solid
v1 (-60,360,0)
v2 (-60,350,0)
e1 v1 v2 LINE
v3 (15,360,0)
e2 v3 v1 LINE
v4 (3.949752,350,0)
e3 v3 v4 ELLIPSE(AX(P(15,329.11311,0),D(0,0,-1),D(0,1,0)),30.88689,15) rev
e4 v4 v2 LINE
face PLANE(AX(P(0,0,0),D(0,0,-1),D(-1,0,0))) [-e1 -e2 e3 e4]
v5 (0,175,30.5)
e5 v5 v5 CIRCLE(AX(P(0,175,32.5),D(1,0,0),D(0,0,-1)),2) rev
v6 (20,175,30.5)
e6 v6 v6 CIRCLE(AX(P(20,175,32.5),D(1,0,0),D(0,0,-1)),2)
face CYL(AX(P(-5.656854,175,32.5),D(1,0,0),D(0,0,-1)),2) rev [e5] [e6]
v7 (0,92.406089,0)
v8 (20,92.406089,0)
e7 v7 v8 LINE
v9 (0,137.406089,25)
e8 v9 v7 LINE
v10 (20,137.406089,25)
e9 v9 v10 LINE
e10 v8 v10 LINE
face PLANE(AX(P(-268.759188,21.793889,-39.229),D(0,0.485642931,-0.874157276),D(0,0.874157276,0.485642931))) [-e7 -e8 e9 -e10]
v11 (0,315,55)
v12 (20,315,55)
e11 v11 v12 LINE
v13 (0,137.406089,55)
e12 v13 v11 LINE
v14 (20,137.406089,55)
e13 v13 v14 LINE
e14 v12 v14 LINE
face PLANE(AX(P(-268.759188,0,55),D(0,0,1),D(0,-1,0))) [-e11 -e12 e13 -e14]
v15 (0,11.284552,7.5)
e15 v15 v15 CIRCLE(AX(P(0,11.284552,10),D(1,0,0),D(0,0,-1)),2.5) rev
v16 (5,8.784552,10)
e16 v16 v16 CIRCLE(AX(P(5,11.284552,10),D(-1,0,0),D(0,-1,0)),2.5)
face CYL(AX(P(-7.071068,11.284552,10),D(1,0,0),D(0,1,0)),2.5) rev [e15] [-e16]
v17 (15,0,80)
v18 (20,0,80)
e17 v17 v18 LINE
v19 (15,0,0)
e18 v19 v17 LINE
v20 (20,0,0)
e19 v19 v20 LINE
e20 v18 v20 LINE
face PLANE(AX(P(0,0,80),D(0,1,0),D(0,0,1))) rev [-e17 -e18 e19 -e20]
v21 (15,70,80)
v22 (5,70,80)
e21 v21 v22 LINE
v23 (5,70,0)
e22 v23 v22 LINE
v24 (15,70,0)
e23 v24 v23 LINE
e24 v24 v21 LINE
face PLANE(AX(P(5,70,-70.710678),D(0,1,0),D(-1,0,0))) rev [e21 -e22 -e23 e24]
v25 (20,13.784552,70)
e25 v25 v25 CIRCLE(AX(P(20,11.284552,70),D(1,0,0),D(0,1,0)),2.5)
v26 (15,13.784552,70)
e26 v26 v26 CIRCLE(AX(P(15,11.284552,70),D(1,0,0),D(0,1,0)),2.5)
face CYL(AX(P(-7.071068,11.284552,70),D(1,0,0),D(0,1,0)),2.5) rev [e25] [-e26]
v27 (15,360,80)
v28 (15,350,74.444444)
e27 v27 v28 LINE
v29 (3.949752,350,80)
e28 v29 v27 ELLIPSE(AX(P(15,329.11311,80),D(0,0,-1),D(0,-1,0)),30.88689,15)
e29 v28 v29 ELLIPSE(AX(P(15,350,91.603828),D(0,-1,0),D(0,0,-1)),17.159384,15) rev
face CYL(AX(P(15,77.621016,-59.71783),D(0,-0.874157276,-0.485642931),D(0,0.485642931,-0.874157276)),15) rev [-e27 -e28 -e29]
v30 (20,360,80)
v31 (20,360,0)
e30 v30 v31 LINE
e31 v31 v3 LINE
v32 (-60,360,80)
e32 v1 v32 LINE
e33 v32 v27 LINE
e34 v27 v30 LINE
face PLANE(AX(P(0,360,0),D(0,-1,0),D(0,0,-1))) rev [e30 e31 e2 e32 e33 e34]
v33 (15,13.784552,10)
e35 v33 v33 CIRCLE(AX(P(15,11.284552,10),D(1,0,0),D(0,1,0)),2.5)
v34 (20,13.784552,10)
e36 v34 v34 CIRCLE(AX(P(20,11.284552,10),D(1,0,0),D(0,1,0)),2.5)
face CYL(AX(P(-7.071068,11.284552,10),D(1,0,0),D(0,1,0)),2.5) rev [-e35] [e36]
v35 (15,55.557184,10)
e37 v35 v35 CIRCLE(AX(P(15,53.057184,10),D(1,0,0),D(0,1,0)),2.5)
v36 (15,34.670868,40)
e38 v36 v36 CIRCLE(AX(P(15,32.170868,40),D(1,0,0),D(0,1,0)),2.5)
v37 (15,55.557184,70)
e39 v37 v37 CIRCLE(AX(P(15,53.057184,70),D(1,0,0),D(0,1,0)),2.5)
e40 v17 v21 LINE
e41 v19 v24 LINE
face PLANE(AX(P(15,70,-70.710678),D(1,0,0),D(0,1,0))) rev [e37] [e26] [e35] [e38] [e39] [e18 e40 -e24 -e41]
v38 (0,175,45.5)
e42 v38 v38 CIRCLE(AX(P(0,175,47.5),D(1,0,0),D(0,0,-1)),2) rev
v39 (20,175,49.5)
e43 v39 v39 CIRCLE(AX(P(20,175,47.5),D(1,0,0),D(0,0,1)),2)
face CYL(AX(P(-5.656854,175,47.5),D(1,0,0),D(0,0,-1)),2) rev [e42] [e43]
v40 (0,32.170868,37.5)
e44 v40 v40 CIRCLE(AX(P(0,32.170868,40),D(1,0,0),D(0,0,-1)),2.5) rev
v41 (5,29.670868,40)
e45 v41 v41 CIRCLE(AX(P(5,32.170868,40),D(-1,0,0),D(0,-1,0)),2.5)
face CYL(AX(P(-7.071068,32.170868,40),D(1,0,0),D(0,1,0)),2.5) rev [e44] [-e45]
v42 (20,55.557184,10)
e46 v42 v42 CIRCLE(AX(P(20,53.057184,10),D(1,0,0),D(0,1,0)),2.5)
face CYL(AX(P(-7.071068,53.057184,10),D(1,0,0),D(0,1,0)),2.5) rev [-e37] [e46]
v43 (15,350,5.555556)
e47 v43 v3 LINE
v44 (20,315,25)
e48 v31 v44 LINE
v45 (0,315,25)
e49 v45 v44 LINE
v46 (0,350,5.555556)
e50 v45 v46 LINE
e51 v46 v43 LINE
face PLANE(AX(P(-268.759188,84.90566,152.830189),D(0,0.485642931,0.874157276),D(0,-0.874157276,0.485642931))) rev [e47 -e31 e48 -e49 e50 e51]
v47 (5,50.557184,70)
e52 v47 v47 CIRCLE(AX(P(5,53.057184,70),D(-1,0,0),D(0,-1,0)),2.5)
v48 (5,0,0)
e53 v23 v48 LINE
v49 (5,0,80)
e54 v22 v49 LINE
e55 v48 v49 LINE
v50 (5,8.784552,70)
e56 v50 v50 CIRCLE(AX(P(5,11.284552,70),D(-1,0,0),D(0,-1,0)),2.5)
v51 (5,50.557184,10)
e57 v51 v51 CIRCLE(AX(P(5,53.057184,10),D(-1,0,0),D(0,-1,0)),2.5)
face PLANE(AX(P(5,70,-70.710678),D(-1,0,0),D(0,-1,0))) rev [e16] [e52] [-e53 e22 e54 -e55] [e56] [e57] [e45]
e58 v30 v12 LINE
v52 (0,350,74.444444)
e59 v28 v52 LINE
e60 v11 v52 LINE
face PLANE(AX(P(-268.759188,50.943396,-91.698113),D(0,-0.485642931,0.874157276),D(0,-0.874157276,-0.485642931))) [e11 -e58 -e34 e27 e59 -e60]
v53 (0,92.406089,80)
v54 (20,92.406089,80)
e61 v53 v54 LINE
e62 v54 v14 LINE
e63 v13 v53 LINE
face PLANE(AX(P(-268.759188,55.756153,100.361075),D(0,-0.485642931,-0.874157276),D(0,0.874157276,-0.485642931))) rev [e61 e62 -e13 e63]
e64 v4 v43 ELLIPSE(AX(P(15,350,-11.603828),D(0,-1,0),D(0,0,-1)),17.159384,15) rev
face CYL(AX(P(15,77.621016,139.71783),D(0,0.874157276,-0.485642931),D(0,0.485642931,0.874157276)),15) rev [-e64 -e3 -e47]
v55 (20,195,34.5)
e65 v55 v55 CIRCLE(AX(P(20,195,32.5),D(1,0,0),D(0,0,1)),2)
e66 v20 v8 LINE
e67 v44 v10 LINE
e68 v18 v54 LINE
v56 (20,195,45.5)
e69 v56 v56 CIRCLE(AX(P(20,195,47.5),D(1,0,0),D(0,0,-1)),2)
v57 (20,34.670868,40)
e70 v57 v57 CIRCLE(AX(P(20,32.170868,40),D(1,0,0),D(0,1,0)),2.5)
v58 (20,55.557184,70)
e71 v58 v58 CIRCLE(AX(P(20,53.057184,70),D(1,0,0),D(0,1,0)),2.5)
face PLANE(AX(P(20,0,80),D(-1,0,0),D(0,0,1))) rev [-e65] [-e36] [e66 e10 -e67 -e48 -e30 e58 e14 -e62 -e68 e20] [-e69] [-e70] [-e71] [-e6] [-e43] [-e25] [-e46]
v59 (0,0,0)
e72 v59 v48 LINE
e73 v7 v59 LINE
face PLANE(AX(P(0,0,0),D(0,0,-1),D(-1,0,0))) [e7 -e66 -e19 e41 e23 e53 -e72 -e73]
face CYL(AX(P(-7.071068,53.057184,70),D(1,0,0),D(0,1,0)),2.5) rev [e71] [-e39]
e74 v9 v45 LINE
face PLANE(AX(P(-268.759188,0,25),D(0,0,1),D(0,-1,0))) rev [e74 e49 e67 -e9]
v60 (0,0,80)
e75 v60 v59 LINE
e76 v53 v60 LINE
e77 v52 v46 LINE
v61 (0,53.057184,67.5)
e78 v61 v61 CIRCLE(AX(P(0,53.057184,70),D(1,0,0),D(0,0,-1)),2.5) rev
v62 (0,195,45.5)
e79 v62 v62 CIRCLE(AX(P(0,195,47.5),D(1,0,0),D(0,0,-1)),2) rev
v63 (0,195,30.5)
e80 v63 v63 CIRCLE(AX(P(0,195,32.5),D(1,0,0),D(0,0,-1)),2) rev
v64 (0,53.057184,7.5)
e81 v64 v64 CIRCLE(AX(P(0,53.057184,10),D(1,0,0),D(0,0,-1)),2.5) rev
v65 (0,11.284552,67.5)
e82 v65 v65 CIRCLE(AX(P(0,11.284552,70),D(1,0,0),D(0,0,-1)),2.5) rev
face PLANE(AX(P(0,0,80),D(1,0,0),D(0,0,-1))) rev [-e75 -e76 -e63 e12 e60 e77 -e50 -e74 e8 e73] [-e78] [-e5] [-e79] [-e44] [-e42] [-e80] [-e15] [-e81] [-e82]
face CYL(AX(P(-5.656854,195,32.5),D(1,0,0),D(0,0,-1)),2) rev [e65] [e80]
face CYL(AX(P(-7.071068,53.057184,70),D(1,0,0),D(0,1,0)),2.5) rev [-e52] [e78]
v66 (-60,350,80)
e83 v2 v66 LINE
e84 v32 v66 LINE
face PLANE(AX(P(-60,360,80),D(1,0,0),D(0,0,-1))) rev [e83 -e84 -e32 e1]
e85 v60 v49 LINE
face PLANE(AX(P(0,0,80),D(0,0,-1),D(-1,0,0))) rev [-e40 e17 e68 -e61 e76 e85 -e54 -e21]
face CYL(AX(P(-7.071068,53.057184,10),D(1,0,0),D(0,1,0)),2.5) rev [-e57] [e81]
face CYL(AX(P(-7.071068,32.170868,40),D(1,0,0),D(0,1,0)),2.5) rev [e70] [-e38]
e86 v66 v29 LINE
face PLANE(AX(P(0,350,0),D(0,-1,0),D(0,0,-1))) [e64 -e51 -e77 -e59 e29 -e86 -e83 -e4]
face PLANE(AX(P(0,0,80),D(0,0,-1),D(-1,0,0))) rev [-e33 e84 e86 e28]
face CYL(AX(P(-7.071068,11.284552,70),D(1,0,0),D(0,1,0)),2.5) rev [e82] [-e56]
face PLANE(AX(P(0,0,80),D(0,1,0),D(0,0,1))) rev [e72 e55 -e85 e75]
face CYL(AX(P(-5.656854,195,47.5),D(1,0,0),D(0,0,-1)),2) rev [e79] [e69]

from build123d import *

# Parameters (mm, degrees)
SUPPORT_BALISE_W                           = 20
SUPPORT_BALISE_H                           = 350
SUPPORT_BALISE_BOSSAGE_DEPTH               = 80
ESQUISSE3_W                                = 80
ESQUISSE3_H                                = 80
SUPPORT_CHEVAL_ENLEVEMENT_DE_MATIERE_DEPTH = 10
ESQUISSE8_W                                = 10
ESQUISSE8_H                                = 70
SUPPORT_CHEVAL_DEPTH                       = 80
VIS_REACH                                  = 376.466
SERRAGE_VIS_R                              = 2.5
VIS_DIRECTION_2_DEPTH                      = 375.466286867
ENL_V_MAT_EXTRU_5_DEPTH                    = 20
POUR_IMPRESSION_R                          = 15
FIXATION_POUR_ASSEMBLAGE_R                 = 2
VIS_POUR_ASSEMBLAGE_DEPTH                  = 20


with BuildPart() as part:
    # Support Balise → Support balise bossage (new body)
    with BuildSketch(Plane.XY):
        with Locations((10, 175)):
            Rectangle(SUPPORT_BALISE_W, SUPPORT_BALISE_H)
    extrude(amount=SUPPORT_BALISE_BOSSAGE_DEPTH)

    # Esquisse3 → Support Cheval enlevement de matiere (add)
    with BuildSketch(Plane(origin=(0, 350, 0), x_dir=(1, 0, 0), z_dir=(0, 1, 0))):
        with Locations((-20, -40)):
            Rectangle(ESQUISSE3_W, ESQUISSE3_H)
    extrude(amount=SUPPORT_CHEVAL_ENLEVEMENT_DE_MATIERE_DEPTH)

    # Esquisse8 → Support Cheval (cut)
    with BuildSketch(Plane.XY.offset(80)):
        with Locations((10, 35)):
            Rectangle(ESQUISSE8_W, ESQUISSE8_H)
    extrude(amount=-SUPPORT_CHEVAL_DEPTH, mode=Mode.SUBTRACT)

    # Vis: up to this face of the body (flat: up to its plane)
    vis_end = Plane(part.part.faces().sort_by_distance((0, 175, 40))[0])
    # Serrage vis → Vis (cut, up to the picked face)
    with BuildSketch(Plane(origin=(5, 0, 0), x_dir=(0, 0, -1), z_dir=(1, 0, 0)), mode=Mode.PRIVATE) as vis_sk1:
        with Locations((-70, 11.284552026)):
            Circle(SERRAGE_VIS_R)
    vis_tool1 = split(extrude(vis_sk1.sketch, amount=-VIS_REACH, mode=Mode.PRIVATE), bisect_by=vis_end, keep=Keep.BOTH, mode=Mode.PRIVATE)
    # Serrage vis → Vis (cut, up to the picked face)
    with BuildSketch(Plane(origin=(5, 0, 0), x_dir=(0, 0, -1), z_dir=(1, 0, 0)), mode=Mode.PRIVATE) as vis_sk2:
        with Locations((-70, 53.057184379)):
            Circle(SERRAGE_VIS_R)
    vis_tool2 = split(extrude(vis_sk2.sketch, amount=-VIS_REACH, mode=Mode.PRIVATE), bisect_by=vis_end, keep=Keep.BOTH, mode=Mode.PRIVATE)
    # Serrage vis → Vis (cut, up to the picked face)
    with BuildSketch(Plane(origin=(5, 0, 0), x_dir=(0, 0, -1), z_dir=(1, 0, 0)), mode=Mode.PRIVATE) as vis_sk3:
        with Locations((-10, 53.057184379)):
            Circle(SERRAGE_VIS_R)
    vis_tool3 = split(extrude(vis_sk3.sketch, amount=-VIS_REACH, mode=Mode.PRIVATE), bisect_by=vis_end, keep=Keep.BOTH, mode=Mode.PRIVATE)
    # Serrage vis → Vis (cut, up to the picked face)
    with BuildSketch(Plane(origin=(5, 0, 0), x_dir=(0, 0, -1), z_dir=(1, 0, 0)), mode=Mode.PRIVATE) as vis_sk4:
        with Locations((-10, 11.284552026)):
            Circle(SERRAGE_VIS_R)
    vis_tool4 = split(extrude(vis_sk4.sketch, amount=-VIS_REACH, mode=Mode.PRIVATE), bisect_by=vis_end, keep=Keep.BOTH, mode=Mode.PRIVATE)
    # Serrage vis → Vis (cut, up to the picked face)
    with BuildSketch(Plane(origin=(5, 0, 0), x_dir=(0, 0, -1), z_dir=(1, 0, 0)), mode=Mode.PRIVATE) as vis_sk5:
        with Locations((-40, 32.170868202)):
            Circle(SERRAGE_VIS_R)
    vis_tool5 = split(extrude(vis_sk5.sketch, amount=-VIS_REACH, mode=Mode.PRIVATE), bisect_by=vis_end, keep=Keep.BOTH, mode=Mode.PRIVATE)
    add(vis_tool1.solids().sort_by(Axis((5, 11.284552, 70), (-1, 0, 0)))[0], mode=Mode.SUBTRACT)
    add(vis_tool2.solids().sort_by(Axis((5, 53.057184, 70), (-1, 0, 0)))[0], mode=Mode.SUBTRACT)
    add(vis_tool3.solids().sort_by(Axis((5, 53.057184, 10), (-1, 0, 0)))[0], mode=Mode.SUBTRACT)
    add(vis_tool4.solids().sort_by(Axis((5, 11.284552, 10), (-1, 0, 0)))[0], mode=Mode.SUBTRACT)
    add(vis_tool5.solids().sort_by(Axis((5, 32.170868, 40), (-1, 0, 0)))[0], mode=Mode.SUBTRACT)

    # Serrage vis → Vis direction 2 (cut)
    with BuildSketch(Plane(origin=(5, 0, 0), x_dir=(0, 0, -1), z_dir=(1, 0, 0))):
        with Locations((-70, 11.284552026)):
            Circle(SERRAGE_VIS_R)
        with Locations((-70, 53.057184379)):
            Circle(SERRAGE_VIS_R)
        with Locations((-10, 53.057184379)):
            Circle(SERRAGE_VIS_R)
        with Locations((-10, 11.284552026)):
            Circle(SERRAGE_VIS_R)
        with Locations((-40, 32.170868202)):
            Circle(SERRAGE_VIS_R)
    extrude(amount=VIS_DIRECTION_2_DEPTH, mode=Mode.SUBTRACT)

    # Design → Enlèv. mat.-Extru.5 (cut)
    with BuildSketch(Plane(origin=(20, 0, 0), x_dir=(0, 0, -1), z_dir=(1, 0, 0))):
        Polygon((-55, 315), (-80, 360), (-80, 92.406088827), (-55, 137.406088827), align=None)
        Polygon((0, 92.406088827), (0, 360), (-25, 315), (-25, 137.406088827), align=None)
    extrude(amount=-ENL_V_MAT_EXTRU_5_DEPTH, mode=Mode.SUBTRACT)

    # Pour Impression
    # the kernel refuses this fillet: 15 mm, written as the material it adds along each edge
    with BuildSketch(Plane(origin=(0, 392.780897855, -18.211609919), x_dir=(1, 0, 0), z_dir=(0, -0.8741572761215375, 0.48564293117863266))) as pour_impression_piece_1_section:
        with BuildLine():
            CenterArc((POUR_IMPRESSION_R, -POUR_IMPRESSION_R), POUR_IMPRESSION_R, 90, 90)
            Line((0, -POUR_IMPRESSION_R), (0, 0))
            Line((0, 0), (POUR_IMPRESSION_R, 0))
        make_face()
    pour_impression_piece_1 = extrude(amount=86.439589046, mode=Mode.PRIVATE)
    pour_impression_piece_1 = split(pour_impression_piece_1, bisect_by=Plane(origin=(4.741525676, 350, 2.029382941), z_dir=(0, 1, 0)), keep=Keep.TOP, mode=Mode.PRIVATE)
    pour_impression_piece_1 = split(pour_impression_piece_1, bisect_by=Plane(origin=(4.741525676, 353.652889294, 0), z_dir=(0, 0, 1)), keep=Keep.TOP, mode=Mode.PRIVATE)
    add(pour_impression_piece_1)
    with BuildSketch(Plane(origin=(0, 317.219102145, 56.232834525), x_dir=(1, 0, 0), z_dir=(0, 0.8741572761215377, 0.4856429311786322))) as pour_impression_piece_2_section:
        with BuildLine():
            CenterArc((POUR_IMPRESSION_R, -POUR_IMPRESSION_R), POUR_IMPRESSION_R, 90, 90)
            Line((0, -POUR_IMPRESSION_R), (0, 0))
            Line((0, 0), (POUR_IMPRESSION_R, 0))
        make_face()
    pour_impression_piece_2 = extrude(amount=86.439589046, mode=Mode.PRIVATE)
    pour_impression_piece_2 = split(pour_impression_piece_2, bisect_by=Plane(origin=(4.741525676, 350, 77.970617059), z_dir=(0, 1, 0)), keep=Keep.TOP, mode=Mode.PRIVATE)
    pour_impression_piece_2 = split(pour_impression_piece_2, bisect_by=Plane(origin=(4.741525676, 353.652889294, 80), z_dir=(0, 0, -1)), keep=Keep.TOP, mode=Mode.PRIVATE)
    add(pour_impression_piece_2)

    # Fixation pour assemblage → Vis pour Assemblage (cut)
    with BuildSketch(Plane(origin=(20, 0, 0), x_dir=(0, 0, -1), z_dir=(1, 0, 0))):
        with Locations((-47.5, 195)):
            Circle(FIXATION_POUR_ASSEMBLAGE_R)
        with Locations((-32.5, 195)):
            Circle(FIXATION_POUR_ASSEMBLAGE_R)
        with Locations((-32.5, 175)):
            Circle(FIXATION_POUR_ASSEMBLAGE_R)
        with Locations((-47.5, 175)):
            Circle(FIXATION_POUR_ASSEMBLAGE_R)
    extrude(amount=-VIS_POUR_ASSEMBLAGE_DEPTH, mode=Mode.SUBTRACT)


solid = part.part
